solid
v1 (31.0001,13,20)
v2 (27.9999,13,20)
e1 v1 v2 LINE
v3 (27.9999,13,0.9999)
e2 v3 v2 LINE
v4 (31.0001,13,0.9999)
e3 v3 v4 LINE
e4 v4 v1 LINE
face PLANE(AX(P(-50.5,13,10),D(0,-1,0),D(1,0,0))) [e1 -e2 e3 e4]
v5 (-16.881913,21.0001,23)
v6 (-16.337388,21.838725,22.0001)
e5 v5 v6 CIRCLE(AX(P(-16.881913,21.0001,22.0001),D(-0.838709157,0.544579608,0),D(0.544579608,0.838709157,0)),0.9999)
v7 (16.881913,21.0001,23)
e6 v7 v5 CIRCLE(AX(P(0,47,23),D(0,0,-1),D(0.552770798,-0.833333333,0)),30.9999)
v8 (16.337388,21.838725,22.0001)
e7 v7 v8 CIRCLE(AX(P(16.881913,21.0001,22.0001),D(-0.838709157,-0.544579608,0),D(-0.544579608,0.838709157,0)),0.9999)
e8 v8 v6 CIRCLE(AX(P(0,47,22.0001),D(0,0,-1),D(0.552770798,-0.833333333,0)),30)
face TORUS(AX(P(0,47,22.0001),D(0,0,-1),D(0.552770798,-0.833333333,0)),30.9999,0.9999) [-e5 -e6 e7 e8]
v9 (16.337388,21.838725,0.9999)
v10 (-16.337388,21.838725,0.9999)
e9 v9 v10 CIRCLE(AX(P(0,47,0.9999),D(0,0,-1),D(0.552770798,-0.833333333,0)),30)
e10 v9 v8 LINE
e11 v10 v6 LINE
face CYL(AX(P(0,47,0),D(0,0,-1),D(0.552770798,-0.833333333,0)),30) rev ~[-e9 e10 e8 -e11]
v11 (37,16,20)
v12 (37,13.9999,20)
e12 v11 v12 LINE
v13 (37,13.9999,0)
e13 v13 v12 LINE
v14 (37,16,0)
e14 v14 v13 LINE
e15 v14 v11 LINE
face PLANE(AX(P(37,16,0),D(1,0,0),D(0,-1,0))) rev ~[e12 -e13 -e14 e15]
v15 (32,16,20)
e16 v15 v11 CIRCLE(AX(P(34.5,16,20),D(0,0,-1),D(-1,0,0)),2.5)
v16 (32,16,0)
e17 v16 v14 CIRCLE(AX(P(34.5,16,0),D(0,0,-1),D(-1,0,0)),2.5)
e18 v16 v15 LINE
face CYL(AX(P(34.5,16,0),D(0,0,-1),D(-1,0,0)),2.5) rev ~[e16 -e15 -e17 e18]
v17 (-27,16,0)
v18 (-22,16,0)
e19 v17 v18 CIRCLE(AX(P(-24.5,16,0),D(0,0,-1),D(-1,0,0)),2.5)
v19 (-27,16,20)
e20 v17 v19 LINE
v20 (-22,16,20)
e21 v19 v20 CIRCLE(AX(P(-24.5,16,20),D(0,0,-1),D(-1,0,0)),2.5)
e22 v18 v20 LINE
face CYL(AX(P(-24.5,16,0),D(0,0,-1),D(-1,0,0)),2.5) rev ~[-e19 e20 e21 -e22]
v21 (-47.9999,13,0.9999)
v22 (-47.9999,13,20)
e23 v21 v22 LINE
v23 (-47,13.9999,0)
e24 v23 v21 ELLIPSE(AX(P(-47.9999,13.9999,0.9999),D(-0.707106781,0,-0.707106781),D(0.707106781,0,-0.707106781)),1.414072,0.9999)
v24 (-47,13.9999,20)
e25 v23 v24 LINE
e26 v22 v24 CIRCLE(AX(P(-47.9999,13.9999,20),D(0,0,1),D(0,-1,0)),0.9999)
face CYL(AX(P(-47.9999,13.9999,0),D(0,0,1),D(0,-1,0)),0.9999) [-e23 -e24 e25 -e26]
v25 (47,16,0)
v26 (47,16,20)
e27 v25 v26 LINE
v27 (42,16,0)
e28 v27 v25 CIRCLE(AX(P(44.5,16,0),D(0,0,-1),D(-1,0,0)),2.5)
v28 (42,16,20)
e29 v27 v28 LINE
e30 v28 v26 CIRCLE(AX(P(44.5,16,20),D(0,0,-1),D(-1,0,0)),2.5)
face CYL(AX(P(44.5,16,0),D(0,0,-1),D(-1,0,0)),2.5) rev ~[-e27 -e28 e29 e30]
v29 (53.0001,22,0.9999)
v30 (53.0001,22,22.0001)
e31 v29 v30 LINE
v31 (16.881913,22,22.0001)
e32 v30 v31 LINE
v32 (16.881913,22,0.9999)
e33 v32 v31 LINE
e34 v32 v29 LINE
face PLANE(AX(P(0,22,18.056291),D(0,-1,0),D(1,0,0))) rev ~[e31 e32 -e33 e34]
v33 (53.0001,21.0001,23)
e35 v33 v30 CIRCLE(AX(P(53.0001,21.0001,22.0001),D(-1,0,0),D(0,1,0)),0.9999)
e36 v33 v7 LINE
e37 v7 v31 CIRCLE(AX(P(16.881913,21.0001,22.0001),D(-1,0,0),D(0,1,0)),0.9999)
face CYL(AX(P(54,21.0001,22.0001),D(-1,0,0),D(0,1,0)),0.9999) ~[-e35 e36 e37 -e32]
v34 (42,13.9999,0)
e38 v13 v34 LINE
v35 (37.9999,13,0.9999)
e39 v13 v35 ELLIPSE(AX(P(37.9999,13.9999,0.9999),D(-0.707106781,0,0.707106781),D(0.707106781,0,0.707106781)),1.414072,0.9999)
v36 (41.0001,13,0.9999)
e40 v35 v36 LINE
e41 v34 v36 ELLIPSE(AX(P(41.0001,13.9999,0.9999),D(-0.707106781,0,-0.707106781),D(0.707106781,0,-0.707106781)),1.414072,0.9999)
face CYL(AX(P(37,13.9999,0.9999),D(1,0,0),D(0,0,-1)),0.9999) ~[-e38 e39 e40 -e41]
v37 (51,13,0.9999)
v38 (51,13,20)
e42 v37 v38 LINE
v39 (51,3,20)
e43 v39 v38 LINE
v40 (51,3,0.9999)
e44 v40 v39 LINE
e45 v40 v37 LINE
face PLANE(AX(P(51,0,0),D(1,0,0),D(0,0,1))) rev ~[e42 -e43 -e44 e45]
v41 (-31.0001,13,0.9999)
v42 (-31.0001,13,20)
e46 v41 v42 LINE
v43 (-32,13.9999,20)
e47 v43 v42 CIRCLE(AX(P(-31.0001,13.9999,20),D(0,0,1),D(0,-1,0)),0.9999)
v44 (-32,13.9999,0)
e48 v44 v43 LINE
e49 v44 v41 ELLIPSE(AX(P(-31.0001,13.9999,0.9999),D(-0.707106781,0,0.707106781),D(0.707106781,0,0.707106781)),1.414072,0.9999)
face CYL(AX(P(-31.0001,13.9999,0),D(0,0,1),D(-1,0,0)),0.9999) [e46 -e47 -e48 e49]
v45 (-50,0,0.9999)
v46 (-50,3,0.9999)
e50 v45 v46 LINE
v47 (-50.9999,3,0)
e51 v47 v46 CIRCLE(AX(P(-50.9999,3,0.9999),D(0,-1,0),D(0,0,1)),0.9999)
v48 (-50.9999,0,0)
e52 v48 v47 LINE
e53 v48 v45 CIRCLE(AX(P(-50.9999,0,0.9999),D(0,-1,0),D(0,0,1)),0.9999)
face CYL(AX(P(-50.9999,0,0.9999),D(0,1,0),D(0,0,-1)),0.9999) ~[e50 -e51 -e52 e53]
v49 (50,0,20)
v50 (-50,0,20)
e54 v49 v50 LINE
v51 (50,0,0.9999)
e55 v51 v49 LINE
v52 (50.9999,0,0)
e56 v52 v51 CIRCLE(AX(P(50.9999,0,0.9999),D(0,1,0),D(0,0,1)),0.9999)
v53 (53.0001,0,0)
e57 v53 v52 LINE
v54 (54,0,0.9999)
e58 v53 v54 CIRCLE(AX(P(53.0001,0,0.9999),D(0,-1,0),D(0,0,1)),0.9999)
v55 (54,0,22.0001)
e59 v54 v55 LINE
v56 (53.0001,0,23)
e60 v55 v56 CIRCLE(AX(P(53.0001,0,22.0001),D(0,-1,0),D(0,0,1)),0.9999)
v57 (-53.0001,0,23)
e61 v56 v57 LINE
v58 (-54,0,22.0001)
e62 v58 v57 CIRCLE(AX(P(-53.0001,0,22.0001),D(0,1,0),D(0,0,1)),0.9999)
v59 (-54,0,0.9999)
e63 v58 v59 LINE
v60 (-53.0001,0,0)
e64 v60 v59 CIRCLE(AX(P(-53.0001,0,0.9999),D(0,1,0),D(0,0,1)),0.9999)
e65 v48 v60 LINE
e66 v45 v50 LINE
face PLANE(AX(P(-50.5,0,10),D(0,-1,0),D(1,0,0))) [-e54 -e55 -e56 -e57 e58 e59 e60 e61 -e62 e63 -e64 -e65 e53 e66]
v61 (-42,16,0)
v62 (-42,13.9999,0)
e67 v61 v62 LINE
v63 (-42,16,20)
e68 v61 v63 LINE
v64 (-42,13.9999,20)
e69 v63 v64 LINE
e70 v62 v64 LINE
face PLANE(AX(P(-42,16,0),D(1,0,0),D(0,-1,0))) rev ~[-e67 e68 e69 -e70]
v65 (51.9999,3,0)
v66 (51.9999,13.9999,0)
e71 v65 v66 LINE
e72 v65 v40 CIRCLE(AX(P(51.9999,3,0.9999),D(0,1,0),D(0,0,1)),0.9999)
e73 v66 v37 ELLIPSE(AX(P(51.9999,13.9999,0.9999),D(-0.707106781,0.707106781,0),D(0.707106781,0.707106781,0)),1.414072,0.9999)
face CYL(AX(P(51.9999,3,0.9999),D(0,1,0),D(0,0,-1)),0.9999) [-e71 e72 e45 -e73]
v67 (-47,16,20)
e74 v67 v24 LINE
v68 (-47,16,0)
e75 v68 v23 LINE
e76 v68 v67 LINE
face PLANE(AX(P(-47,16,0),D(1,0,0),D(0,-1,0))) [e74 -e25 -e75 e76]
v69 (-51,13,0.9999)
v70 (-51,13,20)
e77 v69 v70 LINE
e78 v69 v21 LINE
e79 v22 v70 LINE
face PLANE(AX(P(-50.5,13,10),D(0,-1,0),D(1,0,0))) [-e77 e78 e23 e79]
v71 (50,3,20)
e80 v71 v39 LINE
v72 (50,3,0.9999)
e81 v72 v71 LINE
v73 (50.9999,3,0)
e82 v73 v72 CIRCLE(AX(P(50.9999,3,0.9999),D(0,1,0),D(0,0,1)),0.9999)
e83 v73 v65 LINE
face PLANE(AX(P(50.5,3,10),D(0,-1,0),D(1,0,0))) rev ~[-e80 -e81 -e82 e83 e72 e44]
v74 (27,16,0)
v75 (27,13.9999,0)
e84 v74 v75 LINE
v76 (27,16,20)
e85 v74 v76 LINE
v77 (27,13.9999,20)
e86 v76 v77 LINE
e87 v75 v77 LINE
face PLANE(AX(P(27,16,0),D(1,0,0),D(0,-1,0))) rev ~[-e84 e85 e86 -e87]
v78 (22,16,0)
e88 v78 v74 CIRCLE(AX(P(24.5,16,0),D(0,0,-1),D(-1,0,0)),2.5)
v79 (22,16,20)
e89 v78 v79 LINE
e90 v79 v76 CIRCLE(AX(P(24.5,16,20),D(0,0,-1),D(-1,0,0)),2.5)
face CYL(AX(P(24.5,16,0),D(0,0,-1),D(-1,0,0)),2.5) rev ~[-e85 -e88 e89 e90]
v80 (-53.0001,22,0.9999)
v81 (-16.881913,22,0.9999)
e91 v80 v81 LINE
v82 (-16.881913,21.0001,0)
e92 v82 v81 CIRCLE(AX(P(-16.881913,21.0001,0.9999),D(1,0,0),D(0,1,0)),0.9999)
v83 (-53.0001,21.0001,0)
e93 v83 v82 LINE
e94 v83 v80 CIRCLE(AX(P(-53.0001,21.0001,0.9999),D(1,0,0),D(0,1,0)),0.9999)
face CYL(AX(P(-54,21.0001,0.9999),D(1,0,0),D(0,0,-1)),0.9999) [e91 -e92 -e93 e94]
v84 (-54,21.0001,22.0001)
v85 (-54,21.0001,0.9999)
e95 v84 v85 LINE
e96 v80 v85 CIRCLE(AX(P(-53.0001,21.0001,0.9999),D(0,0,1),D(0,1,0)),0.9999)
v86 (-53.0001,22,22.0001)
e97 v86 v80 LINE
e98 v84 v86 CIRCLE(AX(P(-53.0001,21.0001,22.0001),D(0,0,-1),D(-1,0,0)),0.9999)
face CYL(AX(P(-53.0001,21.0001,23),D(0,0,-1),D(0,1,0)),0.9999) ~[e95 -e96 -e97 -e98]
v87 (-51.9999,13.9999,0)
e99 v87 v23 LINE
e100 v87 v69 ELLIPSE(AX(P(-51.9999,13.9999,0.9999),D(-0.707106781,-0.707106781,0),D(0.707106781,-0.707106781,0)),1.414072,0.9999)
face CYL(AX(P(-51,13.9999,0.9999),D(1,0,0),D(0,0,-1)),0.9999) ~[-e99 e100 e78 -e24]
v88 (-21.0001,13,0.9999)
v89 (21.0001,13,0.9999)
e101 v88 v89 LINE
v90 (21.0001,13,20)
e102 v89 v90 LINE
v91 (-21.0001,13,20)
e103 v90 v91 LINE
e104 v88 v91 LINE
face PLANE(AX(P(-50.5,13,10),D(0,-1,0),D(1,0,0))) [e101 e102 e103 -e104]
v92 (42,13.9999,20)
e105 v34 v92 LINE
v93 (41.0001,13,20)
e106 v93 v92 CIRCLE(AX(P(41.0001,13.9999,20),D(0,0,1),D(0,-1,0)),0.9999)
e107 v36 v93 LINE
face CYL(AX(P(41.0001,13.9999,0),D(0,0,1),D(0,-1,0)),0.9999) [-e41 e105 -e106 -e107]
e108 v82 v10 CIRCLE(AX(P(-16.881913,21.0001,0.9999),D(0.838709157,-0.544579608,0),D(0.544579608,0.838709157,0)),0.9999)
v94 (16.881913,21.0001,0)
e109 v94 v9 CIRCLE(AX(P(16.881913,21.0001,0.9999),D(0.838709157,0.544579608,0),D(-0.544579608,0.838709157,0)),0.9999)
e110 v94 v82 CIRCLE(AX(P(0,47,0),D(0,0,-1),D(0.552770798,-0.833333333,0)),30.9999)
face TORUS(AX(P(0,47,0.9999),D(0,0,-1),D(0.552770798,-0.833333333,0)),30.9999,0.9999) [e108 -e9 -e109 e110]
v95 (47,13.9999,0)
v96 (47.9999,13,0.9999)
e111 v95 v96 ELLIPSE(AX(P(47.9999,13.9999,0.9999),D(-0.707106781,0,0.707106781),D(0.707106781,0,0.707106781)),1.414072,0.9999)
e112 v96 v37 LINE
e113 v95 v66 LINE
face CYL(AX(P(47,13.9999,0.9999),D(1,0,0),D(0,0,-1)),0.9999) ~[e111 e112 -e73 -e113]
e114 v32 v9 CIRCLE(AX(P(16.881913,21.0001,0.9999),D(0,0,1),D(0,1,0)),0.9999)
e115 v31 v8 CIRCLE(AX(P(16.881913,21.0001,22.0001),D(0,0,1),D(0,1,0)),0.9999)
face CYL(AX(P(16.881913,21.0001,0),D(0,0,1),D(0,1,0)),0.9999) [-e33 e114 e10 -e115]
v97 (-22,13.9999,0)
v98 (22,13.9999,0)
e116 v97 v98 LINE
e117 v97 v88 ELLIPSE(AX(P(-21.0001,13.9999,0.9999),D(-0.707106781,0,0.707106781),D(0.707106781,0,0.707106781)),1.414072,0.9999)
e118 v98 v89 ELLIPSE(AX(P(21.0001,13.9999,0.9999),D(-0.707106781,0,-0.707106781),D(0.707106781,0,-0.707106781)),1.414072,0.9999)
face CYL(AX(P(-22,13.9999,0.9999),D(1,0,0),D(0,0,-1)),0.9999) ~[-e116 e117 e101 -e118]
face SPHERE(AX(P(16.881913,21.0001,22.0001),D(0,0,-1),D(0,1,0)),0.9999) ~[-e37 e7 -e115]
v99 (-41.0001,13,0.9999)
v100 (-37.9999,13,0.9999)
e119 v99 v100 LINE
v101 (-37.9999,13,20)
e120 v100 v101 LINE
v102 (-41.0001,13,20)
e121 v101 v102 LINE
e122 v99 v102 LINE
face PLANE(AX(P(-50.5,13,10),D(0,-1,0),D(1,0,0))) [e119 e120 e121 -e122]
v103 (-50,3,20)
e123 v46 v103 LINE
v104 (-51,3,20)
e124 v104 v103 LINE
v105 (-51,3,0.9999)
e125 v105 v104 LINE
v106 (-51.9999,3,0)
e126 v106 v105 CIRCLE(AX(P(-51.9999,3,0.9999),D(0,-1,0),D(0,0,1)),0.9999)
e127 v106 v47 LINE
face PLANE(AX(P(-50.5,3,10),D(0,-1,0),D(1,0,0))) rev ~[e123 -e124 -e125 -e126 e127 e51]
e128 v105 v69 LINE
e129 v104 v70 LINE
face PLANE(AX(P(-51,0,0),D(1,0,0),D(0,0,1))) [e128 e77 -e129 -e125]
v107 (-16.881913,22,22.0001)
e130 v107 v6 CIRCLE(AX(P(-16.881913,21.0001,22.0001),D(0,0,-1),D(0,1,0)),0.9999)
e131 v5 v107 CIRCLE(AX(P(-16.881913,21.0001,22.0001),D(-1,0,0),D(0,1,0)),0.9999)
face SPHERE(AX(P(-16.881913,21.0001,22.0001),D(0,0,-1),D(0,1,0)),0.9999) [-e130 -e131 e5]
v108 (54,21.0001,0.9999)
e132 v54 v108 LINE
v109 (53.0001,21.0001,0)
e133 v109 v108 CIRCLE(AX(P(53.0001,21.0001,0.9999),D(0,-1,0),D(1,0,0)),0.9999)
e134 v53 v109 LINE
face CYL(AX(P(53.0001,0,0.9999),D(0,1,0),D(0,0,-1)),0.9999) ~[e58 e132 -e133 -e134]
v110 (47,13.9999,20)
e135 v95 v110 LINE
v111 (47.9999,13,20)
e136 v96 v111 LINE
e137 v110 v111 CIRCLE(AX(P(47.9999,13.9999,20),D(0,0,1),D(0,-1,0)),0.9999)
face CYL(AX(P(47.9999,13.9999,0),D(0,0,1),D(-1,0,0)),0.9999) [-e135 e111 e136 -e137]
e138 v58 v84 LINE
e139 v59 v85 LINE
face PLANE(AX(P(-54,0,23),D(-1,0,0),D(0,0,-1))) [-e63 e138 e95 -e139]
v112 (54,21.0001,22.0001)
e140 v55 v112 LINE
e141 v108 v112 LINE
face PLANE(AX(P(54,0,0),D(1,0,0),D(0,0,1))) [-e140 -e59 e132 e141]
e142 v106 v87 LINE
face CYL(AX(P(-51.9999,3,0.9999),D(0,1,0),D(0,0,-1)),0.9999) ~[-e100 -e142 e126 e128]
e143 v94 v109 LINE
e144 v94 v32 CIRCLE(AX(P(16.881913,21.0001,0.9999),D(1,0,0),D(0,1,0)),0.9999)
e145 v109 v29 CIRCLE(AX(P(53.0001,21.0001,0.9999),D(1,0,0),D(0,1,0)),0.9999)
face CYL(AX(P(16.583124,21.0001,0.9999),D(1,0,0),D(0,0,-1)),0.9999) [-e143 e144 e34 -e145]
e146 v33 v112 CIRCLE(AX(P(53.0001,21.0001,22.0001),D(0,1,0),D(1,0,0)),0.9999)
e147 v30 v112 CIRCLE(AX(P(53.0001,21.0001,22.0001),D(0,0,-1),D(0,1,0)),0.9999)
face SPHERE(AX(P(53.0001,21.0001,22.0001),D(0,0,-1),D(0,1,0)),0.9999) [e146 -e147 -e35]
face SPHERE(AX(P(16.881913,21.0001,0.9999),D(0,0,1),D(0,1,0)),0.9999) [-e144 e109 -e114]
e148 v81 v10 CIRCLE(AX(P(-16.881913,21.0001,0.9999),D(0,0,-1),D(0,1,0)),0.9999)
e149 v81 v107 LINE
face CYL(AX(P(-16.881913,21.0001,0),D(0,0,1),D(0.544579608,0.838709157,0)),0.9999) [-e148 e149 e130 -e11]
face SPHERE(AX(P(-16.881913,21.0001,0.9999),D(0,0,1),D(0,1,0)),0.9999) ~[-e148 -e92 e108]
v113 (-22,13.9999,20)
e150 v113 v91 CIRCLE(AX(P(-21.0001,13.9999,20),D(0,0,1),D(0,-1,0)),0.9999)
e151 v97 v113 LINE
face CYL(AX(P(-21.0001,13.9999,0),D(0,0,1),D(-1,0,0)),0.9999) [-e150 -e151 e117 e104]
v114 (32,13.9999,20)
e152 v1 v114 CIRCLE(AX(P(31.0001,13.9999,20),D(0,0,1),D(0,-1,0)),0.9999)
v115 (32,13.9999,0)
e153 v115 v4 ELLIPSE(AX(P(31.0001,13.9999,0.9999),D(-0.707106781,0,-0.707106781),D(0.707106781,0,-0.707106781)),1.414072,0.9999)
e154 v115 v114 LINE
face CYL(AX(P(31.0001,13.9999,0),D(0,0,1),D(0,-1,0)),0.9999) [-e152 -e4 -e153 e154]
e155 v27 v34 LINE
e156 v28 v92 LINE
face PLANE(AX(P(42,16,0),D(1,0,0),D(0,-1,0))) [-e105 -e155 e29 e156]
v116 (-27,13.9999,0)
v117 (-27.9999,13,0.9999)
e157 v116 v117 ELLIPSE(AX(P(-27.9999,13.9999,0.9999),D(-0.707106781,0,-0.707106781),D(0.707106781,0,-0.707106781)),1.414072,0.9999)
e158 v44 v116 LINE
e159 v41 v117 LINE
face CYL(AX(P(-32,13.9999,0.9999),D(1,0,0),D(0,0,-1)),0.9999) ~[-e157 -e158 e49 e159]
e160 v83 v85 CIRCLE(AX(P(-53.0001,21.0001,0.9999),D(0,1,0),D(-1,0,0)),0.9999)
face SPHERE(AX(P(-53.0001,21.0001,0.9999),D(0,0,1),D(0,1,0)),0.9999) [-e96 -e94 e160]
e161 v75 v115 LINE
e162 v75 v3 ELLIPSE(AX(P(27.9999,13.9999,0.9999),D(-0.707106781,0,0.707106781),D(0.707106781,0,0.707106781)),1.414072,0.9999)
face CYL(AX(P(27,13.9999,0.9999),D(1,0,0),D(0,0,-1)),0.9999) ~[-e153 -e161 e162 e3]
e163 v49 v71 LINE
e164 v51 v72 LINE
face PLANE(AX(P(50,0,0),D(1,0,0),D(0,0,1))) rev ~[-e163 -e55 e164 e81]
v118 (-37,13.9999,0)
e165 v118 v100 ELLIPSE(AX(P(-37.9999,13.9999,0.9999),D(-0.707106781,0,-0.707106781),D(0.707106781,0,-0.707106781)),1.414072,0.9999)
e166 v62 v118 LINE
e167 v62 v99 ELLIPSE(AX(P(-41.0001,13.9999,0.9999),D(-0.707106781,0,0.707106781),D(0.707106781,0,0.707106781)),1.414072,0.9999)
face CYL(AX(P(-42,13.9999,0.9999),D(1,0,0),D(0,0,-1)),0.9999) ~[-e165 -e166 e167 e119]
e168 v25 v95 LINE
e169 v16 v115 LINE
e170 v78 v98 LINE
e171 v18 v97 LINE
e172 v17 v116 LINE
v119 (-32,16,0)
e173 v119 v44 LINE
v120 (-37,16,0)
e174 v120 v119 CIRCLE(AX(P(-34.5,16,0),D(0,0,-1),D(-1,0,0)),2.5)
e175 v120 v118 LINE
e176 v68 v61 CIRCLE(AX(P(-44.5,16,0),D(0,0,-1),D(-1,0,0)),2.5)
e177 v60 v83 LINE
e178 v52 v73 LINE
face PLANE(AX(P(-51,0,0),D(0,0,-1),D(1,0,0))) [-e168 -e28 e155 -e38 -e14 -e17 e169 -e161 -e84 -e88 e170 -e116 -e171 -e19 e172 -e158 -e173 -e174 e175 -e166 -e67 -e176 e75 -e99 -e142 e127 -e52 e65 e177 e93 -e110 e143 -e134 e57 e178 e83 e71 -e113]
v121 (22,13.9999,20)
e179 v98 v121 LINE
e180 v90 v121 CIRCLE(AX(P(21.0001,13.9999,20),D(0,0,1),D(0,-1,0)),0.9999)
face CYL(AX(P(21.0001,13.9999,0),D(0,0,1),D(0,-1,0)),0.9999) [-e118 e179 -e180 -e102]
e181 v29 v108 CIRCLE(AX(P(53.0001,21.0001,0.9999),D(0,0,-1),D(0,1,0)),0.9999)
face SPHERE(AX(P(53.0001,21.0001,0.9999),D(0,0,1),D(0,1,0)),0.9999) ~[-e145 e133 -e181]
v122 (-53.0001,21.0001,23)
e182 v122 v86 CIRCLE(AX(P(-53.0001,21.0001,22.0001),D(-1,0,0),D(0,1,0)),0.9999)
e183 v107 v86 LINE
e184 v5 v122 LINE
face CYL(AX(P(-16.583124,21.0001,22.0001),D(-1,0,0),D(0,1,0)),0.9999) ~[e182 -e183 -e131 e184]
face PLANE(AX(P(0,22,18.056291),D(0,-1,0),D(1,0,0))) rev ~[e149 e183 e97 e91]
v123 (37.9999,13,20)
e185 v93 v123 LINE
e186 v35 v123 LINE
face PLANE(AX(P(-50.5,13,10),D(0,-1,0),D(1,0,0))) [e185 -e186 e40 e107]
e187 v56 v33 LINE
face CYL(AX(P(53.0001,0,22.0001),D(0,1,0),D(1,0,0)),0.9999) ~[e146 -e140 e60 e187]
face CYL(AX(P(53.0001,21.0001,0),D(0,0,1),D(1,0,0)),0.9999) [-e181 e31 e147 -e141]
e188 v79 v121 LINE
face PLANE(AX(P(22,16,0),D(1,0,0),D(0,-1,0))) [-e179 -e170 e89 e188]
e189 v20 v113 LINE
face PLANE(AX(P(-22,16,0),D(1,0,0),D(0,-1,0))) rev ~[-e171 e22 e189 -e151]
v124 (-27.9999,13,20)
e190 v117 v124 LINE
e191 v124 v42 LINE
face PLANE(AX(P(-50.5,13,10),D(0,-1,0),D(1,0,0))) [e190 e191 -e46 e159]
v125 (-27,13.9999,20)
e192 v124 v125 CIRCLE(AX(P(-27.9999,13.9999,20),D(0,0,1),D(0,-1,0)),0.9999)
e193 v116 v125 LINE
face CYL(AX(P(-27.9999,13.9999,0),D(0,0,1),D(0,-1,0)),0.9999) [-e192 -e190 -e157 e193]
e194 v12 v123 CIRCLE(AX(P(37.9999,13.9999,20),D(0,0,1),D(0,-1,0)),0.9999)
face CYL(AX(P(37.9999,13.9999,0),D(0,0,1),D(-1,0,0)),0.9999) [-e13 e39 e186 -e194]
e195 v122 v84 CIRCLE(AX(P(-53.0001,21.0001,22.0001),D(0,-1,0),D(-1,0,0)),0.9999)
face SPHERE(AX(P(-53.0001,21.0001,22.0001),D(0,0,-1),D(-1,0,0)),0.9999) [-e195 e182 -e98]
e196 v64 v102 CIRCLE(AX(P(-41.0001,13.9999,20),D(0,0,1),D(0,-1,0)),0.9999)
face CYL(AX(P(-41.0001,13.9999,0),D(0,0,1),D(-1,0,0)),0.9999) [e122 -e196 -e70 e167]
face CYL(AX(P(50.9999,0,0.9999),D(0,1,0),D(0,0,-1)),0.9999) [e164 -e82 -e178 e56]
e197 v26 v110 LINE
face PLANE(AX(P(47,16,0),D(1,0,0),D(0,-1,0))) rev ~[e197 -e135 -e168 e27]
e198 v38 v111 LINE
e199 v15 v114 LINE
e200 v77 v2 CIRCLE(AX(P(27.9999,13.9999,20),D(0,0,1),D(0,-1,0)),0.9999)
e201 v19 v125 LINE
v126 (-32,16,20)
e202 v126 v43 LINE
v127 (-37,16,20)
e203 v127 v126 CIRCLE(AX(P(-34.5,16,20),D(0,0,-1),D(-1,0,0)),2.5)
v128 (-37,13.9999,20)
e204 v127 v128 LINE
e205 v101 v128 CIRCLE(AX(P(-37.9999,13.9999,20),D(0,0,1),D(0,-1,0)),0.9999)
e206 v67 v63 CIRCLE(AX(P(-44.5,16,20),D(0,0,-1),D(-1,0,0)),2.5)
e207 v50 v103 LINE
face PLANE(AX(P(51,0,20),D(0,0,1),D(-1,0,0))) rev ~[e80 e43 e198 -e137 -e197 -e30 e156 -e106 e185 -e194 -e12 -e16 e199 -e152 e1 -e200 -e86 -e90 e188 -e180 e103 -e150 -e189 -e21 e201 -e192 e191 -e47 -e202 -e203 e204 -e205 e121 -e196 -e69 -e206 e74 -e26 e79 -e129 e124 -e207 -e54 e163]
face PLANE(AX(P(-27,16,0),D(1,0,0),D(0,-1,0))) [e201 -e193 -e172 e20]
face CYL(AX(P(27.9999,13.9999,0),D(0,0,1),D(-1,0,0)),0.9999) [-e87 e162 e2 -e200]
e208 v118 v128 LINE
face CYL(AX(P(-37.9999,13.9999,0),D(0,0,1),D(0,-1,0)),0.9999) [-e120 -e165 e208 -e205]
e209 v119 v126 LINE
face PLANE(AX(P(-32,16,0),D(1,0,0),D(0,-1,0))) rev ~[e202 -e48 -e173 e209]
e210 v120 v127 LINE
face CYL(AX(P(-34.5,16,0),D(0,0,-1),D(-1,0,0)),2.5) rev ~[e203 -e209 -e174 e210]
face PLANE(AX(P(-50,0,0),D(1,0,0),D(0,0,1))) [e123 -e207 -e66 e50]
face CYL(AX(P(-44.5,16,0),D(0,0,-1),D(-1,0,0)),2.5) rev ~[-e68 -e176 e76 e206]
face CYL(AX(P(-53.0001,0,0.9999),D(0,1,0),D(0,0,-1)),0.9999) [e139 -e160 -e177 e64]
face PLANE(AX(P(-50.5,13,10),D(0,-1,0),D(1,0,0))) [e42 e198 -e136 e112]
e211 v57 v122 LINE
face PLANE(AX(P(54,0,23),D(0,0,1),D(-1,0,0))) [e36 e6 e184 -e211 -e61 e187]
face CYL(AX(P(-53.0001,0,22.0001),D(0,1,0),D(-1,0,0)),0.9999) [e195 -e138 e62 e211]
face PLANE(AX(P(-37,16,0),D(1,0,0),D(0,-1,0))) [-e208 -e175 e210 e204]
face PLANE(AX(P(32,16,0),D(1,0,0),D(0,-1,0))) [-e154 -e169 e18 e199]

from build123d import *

# Parameters (mm, degrees)
F0_W     = 1
F0_H     = 20
F0_W_2   = 100
F1_DEPTH = 22
F2_DEPTH = 13
F3_DEPTH = 3
F5_DEPTH = 23
F4_W     = 5
F4_H     = 3
F6_DEPTH = 20
F7_R     = 0.9999


# Not quite as in the source:
# - a fillet or chamfer is up to 0.001 mm smaller than in the source, because OpenCascade refuses the exact size
# - a feature names something its author has since deleted; it is built from what else it names


with BuildPart() as f1:
    # F0 (on Front) → F1 (new body)
    with BuildSketch(Plane.XZ):
        Polygon((51, 20), (51, 0), (54, 0), (54, 23), (-54, 23), (-54, 0), (-51, 0), (-51, 20), (-50, 20), (50, 20), align=None)
        with Locations((-50.5, 10)):
            Rectangle(F0_W, F0_H)
        with Locations((0, 10)):
            Rectangle(F0_W_2, F0_H)
        with Locations((50.5, 10)):
            Rectangle(F0_W, F0_H)
    extrude(amount=-F1_DEPTH)

    # F0 (on Front) → F2 (cut)
    with BuildSketch(Plane.XZ):
        with Locations((-50.5, 10)):
            Rectangle(F0_W, F0_H)
        with Locations((0, 10)):
            Rectangle(F0_W_2, F0_H)
        with Locations((50.5, 10)):
            Rectangle(F0_W, F0_H)
    extrude(amount=-F2_DEPTH, mode=Mode.SUBTRACT)

    # F0 (on Front) → F3 (join)
    with BuildSketch(Plane.XZ):
        with Locations((-50.5, 10)):
            Rectangle(F0_W, F0_H)
        with Locations((50.5, 10)):
            Rectangle(F0_W, F0_H)
    extrude(amount=-F3_DEPTH)

    # F4 (on face) → F5 (cut, through all)
    with BuildSketch(Plane(origin=(0, 0, 0), x_dir=(1, 0, 0), z_dir=(0, 0, -1))):
        with BuildLine():
            Line((-16.5831239518, -22), (16.5831239518, -22))
            ThreePointArc((16.5831239518, -22), (0, -17), (-16.5831239518, -22))
        make_face()
    extrude(amount=-F5_DEPTH, mode=Mode.SUBTRACT)

    # F4 (on face) → F6 (cut, through all)
    with BuildSketch(Plane(origin=(0, 0, 0), x_dir=(1, 0, 0), z_dir=(0, 0, -1))):
        with Locations((-44.5, -14.5)):
            Rectangle(F4_W, F4_H)
        with Locations((-34.5, -14.5)):
            Rectangle(F4_W, F4_H)
        with Locations((-24.5, -14.5)):
            Rectangle(F4_W, F4_H)
        with Locations((24.5, -14.5)):
            Rectangle(F4_W, F4_H)
        with Locations((34.5, -14.5)):
            Rectangle(F4_W, F4_H)
        with Locations((44.5, -14.5)):
            Rectangle(F4_W, F4_H)
        with BuildLine():
            Line((-42, -16), (-47, -16))
            ThreePointArc((-47, -16), (-44.5, -18.5), (-42, -16))
        make_face()
        with BuildLine():
            Line((-32, -16), (-37, -16))
            ThreePointArc((-37, -16), (-34.5, -18.5), (-32, -16))
        make_face()
        with BuildLine():
            Line((-22, -16), (-27, -16))
            ThreePointArc((-27, -16), (-24.5, -18.5), (-22, -16))
        make_face()
        with BuildLine():
            ThreePointArc((22, -16), (24.5, -18.5), (27, -16))
            Line((27, -16), (22, -16))
        make_face()
        with BuildLine():
            ThreePointArc((32, -16), (34.5, -18.5), (37, -16))
            Line((37, -16), (32, -16))
        make_face()
        with BuildLine():
            ThreePointArc((42, -16), (44.5, -18.5), (47, -16))
            Line((47, -16), (42, -16))
        make_face()
    extrude(amount=-F6_DEPTH, mode=Mode.SUBTRACT)

    # F7 (radius 1 in the source; OpenCascade refuses exactly that, so slightly less here)
    f7_edges = [f1.edges().sort_by_distance(p)[0] for p in [
        (-54, 22, 11.5),
        (54, 22, 11.5),
        (35.291562, 22, 0),
        (-35.291562, 22, 0),
        (54, 11, 0),
        (-54, 11, 0),
        (-54, 11, 23),
        (-35.291562, 22, 23),
        (35.291562, 22, 23),
        (54, 11, 23),
        (-49, 13, 0),
        (-39.5, 13, 0),
        (-29.5, 13, 0),
        (0, 13, 0),
        (29.5, 13, 0),
        (39.5, 13, 0),
        (49, 13, 0),
        (51, 8, 0),
        (-51, 8, 0),
        (-50, 1.5, 0),
        (50, 1.5, 0),
        (0, 17, 23),
        (0, 17, 0),
        (-47, 13, 10),
        (-42, 13, 10),
        (-37, 13, 10),
        (-32, 13, 10),
        (-27, 13, 10),
        (-22, 13, 10),
        (22, 13, 10),
        (27, 13, 10),
        (32, 13, 10),
        (47, 13, 10),
        (42, 13, 10),
        (37, 13, 10),
        (16.583124, 22, 11.5),
        (-16.583124, 22, 11.5),
    ]]
    fillet(f7_edges, radius=F7_R)


solid = f1.part
